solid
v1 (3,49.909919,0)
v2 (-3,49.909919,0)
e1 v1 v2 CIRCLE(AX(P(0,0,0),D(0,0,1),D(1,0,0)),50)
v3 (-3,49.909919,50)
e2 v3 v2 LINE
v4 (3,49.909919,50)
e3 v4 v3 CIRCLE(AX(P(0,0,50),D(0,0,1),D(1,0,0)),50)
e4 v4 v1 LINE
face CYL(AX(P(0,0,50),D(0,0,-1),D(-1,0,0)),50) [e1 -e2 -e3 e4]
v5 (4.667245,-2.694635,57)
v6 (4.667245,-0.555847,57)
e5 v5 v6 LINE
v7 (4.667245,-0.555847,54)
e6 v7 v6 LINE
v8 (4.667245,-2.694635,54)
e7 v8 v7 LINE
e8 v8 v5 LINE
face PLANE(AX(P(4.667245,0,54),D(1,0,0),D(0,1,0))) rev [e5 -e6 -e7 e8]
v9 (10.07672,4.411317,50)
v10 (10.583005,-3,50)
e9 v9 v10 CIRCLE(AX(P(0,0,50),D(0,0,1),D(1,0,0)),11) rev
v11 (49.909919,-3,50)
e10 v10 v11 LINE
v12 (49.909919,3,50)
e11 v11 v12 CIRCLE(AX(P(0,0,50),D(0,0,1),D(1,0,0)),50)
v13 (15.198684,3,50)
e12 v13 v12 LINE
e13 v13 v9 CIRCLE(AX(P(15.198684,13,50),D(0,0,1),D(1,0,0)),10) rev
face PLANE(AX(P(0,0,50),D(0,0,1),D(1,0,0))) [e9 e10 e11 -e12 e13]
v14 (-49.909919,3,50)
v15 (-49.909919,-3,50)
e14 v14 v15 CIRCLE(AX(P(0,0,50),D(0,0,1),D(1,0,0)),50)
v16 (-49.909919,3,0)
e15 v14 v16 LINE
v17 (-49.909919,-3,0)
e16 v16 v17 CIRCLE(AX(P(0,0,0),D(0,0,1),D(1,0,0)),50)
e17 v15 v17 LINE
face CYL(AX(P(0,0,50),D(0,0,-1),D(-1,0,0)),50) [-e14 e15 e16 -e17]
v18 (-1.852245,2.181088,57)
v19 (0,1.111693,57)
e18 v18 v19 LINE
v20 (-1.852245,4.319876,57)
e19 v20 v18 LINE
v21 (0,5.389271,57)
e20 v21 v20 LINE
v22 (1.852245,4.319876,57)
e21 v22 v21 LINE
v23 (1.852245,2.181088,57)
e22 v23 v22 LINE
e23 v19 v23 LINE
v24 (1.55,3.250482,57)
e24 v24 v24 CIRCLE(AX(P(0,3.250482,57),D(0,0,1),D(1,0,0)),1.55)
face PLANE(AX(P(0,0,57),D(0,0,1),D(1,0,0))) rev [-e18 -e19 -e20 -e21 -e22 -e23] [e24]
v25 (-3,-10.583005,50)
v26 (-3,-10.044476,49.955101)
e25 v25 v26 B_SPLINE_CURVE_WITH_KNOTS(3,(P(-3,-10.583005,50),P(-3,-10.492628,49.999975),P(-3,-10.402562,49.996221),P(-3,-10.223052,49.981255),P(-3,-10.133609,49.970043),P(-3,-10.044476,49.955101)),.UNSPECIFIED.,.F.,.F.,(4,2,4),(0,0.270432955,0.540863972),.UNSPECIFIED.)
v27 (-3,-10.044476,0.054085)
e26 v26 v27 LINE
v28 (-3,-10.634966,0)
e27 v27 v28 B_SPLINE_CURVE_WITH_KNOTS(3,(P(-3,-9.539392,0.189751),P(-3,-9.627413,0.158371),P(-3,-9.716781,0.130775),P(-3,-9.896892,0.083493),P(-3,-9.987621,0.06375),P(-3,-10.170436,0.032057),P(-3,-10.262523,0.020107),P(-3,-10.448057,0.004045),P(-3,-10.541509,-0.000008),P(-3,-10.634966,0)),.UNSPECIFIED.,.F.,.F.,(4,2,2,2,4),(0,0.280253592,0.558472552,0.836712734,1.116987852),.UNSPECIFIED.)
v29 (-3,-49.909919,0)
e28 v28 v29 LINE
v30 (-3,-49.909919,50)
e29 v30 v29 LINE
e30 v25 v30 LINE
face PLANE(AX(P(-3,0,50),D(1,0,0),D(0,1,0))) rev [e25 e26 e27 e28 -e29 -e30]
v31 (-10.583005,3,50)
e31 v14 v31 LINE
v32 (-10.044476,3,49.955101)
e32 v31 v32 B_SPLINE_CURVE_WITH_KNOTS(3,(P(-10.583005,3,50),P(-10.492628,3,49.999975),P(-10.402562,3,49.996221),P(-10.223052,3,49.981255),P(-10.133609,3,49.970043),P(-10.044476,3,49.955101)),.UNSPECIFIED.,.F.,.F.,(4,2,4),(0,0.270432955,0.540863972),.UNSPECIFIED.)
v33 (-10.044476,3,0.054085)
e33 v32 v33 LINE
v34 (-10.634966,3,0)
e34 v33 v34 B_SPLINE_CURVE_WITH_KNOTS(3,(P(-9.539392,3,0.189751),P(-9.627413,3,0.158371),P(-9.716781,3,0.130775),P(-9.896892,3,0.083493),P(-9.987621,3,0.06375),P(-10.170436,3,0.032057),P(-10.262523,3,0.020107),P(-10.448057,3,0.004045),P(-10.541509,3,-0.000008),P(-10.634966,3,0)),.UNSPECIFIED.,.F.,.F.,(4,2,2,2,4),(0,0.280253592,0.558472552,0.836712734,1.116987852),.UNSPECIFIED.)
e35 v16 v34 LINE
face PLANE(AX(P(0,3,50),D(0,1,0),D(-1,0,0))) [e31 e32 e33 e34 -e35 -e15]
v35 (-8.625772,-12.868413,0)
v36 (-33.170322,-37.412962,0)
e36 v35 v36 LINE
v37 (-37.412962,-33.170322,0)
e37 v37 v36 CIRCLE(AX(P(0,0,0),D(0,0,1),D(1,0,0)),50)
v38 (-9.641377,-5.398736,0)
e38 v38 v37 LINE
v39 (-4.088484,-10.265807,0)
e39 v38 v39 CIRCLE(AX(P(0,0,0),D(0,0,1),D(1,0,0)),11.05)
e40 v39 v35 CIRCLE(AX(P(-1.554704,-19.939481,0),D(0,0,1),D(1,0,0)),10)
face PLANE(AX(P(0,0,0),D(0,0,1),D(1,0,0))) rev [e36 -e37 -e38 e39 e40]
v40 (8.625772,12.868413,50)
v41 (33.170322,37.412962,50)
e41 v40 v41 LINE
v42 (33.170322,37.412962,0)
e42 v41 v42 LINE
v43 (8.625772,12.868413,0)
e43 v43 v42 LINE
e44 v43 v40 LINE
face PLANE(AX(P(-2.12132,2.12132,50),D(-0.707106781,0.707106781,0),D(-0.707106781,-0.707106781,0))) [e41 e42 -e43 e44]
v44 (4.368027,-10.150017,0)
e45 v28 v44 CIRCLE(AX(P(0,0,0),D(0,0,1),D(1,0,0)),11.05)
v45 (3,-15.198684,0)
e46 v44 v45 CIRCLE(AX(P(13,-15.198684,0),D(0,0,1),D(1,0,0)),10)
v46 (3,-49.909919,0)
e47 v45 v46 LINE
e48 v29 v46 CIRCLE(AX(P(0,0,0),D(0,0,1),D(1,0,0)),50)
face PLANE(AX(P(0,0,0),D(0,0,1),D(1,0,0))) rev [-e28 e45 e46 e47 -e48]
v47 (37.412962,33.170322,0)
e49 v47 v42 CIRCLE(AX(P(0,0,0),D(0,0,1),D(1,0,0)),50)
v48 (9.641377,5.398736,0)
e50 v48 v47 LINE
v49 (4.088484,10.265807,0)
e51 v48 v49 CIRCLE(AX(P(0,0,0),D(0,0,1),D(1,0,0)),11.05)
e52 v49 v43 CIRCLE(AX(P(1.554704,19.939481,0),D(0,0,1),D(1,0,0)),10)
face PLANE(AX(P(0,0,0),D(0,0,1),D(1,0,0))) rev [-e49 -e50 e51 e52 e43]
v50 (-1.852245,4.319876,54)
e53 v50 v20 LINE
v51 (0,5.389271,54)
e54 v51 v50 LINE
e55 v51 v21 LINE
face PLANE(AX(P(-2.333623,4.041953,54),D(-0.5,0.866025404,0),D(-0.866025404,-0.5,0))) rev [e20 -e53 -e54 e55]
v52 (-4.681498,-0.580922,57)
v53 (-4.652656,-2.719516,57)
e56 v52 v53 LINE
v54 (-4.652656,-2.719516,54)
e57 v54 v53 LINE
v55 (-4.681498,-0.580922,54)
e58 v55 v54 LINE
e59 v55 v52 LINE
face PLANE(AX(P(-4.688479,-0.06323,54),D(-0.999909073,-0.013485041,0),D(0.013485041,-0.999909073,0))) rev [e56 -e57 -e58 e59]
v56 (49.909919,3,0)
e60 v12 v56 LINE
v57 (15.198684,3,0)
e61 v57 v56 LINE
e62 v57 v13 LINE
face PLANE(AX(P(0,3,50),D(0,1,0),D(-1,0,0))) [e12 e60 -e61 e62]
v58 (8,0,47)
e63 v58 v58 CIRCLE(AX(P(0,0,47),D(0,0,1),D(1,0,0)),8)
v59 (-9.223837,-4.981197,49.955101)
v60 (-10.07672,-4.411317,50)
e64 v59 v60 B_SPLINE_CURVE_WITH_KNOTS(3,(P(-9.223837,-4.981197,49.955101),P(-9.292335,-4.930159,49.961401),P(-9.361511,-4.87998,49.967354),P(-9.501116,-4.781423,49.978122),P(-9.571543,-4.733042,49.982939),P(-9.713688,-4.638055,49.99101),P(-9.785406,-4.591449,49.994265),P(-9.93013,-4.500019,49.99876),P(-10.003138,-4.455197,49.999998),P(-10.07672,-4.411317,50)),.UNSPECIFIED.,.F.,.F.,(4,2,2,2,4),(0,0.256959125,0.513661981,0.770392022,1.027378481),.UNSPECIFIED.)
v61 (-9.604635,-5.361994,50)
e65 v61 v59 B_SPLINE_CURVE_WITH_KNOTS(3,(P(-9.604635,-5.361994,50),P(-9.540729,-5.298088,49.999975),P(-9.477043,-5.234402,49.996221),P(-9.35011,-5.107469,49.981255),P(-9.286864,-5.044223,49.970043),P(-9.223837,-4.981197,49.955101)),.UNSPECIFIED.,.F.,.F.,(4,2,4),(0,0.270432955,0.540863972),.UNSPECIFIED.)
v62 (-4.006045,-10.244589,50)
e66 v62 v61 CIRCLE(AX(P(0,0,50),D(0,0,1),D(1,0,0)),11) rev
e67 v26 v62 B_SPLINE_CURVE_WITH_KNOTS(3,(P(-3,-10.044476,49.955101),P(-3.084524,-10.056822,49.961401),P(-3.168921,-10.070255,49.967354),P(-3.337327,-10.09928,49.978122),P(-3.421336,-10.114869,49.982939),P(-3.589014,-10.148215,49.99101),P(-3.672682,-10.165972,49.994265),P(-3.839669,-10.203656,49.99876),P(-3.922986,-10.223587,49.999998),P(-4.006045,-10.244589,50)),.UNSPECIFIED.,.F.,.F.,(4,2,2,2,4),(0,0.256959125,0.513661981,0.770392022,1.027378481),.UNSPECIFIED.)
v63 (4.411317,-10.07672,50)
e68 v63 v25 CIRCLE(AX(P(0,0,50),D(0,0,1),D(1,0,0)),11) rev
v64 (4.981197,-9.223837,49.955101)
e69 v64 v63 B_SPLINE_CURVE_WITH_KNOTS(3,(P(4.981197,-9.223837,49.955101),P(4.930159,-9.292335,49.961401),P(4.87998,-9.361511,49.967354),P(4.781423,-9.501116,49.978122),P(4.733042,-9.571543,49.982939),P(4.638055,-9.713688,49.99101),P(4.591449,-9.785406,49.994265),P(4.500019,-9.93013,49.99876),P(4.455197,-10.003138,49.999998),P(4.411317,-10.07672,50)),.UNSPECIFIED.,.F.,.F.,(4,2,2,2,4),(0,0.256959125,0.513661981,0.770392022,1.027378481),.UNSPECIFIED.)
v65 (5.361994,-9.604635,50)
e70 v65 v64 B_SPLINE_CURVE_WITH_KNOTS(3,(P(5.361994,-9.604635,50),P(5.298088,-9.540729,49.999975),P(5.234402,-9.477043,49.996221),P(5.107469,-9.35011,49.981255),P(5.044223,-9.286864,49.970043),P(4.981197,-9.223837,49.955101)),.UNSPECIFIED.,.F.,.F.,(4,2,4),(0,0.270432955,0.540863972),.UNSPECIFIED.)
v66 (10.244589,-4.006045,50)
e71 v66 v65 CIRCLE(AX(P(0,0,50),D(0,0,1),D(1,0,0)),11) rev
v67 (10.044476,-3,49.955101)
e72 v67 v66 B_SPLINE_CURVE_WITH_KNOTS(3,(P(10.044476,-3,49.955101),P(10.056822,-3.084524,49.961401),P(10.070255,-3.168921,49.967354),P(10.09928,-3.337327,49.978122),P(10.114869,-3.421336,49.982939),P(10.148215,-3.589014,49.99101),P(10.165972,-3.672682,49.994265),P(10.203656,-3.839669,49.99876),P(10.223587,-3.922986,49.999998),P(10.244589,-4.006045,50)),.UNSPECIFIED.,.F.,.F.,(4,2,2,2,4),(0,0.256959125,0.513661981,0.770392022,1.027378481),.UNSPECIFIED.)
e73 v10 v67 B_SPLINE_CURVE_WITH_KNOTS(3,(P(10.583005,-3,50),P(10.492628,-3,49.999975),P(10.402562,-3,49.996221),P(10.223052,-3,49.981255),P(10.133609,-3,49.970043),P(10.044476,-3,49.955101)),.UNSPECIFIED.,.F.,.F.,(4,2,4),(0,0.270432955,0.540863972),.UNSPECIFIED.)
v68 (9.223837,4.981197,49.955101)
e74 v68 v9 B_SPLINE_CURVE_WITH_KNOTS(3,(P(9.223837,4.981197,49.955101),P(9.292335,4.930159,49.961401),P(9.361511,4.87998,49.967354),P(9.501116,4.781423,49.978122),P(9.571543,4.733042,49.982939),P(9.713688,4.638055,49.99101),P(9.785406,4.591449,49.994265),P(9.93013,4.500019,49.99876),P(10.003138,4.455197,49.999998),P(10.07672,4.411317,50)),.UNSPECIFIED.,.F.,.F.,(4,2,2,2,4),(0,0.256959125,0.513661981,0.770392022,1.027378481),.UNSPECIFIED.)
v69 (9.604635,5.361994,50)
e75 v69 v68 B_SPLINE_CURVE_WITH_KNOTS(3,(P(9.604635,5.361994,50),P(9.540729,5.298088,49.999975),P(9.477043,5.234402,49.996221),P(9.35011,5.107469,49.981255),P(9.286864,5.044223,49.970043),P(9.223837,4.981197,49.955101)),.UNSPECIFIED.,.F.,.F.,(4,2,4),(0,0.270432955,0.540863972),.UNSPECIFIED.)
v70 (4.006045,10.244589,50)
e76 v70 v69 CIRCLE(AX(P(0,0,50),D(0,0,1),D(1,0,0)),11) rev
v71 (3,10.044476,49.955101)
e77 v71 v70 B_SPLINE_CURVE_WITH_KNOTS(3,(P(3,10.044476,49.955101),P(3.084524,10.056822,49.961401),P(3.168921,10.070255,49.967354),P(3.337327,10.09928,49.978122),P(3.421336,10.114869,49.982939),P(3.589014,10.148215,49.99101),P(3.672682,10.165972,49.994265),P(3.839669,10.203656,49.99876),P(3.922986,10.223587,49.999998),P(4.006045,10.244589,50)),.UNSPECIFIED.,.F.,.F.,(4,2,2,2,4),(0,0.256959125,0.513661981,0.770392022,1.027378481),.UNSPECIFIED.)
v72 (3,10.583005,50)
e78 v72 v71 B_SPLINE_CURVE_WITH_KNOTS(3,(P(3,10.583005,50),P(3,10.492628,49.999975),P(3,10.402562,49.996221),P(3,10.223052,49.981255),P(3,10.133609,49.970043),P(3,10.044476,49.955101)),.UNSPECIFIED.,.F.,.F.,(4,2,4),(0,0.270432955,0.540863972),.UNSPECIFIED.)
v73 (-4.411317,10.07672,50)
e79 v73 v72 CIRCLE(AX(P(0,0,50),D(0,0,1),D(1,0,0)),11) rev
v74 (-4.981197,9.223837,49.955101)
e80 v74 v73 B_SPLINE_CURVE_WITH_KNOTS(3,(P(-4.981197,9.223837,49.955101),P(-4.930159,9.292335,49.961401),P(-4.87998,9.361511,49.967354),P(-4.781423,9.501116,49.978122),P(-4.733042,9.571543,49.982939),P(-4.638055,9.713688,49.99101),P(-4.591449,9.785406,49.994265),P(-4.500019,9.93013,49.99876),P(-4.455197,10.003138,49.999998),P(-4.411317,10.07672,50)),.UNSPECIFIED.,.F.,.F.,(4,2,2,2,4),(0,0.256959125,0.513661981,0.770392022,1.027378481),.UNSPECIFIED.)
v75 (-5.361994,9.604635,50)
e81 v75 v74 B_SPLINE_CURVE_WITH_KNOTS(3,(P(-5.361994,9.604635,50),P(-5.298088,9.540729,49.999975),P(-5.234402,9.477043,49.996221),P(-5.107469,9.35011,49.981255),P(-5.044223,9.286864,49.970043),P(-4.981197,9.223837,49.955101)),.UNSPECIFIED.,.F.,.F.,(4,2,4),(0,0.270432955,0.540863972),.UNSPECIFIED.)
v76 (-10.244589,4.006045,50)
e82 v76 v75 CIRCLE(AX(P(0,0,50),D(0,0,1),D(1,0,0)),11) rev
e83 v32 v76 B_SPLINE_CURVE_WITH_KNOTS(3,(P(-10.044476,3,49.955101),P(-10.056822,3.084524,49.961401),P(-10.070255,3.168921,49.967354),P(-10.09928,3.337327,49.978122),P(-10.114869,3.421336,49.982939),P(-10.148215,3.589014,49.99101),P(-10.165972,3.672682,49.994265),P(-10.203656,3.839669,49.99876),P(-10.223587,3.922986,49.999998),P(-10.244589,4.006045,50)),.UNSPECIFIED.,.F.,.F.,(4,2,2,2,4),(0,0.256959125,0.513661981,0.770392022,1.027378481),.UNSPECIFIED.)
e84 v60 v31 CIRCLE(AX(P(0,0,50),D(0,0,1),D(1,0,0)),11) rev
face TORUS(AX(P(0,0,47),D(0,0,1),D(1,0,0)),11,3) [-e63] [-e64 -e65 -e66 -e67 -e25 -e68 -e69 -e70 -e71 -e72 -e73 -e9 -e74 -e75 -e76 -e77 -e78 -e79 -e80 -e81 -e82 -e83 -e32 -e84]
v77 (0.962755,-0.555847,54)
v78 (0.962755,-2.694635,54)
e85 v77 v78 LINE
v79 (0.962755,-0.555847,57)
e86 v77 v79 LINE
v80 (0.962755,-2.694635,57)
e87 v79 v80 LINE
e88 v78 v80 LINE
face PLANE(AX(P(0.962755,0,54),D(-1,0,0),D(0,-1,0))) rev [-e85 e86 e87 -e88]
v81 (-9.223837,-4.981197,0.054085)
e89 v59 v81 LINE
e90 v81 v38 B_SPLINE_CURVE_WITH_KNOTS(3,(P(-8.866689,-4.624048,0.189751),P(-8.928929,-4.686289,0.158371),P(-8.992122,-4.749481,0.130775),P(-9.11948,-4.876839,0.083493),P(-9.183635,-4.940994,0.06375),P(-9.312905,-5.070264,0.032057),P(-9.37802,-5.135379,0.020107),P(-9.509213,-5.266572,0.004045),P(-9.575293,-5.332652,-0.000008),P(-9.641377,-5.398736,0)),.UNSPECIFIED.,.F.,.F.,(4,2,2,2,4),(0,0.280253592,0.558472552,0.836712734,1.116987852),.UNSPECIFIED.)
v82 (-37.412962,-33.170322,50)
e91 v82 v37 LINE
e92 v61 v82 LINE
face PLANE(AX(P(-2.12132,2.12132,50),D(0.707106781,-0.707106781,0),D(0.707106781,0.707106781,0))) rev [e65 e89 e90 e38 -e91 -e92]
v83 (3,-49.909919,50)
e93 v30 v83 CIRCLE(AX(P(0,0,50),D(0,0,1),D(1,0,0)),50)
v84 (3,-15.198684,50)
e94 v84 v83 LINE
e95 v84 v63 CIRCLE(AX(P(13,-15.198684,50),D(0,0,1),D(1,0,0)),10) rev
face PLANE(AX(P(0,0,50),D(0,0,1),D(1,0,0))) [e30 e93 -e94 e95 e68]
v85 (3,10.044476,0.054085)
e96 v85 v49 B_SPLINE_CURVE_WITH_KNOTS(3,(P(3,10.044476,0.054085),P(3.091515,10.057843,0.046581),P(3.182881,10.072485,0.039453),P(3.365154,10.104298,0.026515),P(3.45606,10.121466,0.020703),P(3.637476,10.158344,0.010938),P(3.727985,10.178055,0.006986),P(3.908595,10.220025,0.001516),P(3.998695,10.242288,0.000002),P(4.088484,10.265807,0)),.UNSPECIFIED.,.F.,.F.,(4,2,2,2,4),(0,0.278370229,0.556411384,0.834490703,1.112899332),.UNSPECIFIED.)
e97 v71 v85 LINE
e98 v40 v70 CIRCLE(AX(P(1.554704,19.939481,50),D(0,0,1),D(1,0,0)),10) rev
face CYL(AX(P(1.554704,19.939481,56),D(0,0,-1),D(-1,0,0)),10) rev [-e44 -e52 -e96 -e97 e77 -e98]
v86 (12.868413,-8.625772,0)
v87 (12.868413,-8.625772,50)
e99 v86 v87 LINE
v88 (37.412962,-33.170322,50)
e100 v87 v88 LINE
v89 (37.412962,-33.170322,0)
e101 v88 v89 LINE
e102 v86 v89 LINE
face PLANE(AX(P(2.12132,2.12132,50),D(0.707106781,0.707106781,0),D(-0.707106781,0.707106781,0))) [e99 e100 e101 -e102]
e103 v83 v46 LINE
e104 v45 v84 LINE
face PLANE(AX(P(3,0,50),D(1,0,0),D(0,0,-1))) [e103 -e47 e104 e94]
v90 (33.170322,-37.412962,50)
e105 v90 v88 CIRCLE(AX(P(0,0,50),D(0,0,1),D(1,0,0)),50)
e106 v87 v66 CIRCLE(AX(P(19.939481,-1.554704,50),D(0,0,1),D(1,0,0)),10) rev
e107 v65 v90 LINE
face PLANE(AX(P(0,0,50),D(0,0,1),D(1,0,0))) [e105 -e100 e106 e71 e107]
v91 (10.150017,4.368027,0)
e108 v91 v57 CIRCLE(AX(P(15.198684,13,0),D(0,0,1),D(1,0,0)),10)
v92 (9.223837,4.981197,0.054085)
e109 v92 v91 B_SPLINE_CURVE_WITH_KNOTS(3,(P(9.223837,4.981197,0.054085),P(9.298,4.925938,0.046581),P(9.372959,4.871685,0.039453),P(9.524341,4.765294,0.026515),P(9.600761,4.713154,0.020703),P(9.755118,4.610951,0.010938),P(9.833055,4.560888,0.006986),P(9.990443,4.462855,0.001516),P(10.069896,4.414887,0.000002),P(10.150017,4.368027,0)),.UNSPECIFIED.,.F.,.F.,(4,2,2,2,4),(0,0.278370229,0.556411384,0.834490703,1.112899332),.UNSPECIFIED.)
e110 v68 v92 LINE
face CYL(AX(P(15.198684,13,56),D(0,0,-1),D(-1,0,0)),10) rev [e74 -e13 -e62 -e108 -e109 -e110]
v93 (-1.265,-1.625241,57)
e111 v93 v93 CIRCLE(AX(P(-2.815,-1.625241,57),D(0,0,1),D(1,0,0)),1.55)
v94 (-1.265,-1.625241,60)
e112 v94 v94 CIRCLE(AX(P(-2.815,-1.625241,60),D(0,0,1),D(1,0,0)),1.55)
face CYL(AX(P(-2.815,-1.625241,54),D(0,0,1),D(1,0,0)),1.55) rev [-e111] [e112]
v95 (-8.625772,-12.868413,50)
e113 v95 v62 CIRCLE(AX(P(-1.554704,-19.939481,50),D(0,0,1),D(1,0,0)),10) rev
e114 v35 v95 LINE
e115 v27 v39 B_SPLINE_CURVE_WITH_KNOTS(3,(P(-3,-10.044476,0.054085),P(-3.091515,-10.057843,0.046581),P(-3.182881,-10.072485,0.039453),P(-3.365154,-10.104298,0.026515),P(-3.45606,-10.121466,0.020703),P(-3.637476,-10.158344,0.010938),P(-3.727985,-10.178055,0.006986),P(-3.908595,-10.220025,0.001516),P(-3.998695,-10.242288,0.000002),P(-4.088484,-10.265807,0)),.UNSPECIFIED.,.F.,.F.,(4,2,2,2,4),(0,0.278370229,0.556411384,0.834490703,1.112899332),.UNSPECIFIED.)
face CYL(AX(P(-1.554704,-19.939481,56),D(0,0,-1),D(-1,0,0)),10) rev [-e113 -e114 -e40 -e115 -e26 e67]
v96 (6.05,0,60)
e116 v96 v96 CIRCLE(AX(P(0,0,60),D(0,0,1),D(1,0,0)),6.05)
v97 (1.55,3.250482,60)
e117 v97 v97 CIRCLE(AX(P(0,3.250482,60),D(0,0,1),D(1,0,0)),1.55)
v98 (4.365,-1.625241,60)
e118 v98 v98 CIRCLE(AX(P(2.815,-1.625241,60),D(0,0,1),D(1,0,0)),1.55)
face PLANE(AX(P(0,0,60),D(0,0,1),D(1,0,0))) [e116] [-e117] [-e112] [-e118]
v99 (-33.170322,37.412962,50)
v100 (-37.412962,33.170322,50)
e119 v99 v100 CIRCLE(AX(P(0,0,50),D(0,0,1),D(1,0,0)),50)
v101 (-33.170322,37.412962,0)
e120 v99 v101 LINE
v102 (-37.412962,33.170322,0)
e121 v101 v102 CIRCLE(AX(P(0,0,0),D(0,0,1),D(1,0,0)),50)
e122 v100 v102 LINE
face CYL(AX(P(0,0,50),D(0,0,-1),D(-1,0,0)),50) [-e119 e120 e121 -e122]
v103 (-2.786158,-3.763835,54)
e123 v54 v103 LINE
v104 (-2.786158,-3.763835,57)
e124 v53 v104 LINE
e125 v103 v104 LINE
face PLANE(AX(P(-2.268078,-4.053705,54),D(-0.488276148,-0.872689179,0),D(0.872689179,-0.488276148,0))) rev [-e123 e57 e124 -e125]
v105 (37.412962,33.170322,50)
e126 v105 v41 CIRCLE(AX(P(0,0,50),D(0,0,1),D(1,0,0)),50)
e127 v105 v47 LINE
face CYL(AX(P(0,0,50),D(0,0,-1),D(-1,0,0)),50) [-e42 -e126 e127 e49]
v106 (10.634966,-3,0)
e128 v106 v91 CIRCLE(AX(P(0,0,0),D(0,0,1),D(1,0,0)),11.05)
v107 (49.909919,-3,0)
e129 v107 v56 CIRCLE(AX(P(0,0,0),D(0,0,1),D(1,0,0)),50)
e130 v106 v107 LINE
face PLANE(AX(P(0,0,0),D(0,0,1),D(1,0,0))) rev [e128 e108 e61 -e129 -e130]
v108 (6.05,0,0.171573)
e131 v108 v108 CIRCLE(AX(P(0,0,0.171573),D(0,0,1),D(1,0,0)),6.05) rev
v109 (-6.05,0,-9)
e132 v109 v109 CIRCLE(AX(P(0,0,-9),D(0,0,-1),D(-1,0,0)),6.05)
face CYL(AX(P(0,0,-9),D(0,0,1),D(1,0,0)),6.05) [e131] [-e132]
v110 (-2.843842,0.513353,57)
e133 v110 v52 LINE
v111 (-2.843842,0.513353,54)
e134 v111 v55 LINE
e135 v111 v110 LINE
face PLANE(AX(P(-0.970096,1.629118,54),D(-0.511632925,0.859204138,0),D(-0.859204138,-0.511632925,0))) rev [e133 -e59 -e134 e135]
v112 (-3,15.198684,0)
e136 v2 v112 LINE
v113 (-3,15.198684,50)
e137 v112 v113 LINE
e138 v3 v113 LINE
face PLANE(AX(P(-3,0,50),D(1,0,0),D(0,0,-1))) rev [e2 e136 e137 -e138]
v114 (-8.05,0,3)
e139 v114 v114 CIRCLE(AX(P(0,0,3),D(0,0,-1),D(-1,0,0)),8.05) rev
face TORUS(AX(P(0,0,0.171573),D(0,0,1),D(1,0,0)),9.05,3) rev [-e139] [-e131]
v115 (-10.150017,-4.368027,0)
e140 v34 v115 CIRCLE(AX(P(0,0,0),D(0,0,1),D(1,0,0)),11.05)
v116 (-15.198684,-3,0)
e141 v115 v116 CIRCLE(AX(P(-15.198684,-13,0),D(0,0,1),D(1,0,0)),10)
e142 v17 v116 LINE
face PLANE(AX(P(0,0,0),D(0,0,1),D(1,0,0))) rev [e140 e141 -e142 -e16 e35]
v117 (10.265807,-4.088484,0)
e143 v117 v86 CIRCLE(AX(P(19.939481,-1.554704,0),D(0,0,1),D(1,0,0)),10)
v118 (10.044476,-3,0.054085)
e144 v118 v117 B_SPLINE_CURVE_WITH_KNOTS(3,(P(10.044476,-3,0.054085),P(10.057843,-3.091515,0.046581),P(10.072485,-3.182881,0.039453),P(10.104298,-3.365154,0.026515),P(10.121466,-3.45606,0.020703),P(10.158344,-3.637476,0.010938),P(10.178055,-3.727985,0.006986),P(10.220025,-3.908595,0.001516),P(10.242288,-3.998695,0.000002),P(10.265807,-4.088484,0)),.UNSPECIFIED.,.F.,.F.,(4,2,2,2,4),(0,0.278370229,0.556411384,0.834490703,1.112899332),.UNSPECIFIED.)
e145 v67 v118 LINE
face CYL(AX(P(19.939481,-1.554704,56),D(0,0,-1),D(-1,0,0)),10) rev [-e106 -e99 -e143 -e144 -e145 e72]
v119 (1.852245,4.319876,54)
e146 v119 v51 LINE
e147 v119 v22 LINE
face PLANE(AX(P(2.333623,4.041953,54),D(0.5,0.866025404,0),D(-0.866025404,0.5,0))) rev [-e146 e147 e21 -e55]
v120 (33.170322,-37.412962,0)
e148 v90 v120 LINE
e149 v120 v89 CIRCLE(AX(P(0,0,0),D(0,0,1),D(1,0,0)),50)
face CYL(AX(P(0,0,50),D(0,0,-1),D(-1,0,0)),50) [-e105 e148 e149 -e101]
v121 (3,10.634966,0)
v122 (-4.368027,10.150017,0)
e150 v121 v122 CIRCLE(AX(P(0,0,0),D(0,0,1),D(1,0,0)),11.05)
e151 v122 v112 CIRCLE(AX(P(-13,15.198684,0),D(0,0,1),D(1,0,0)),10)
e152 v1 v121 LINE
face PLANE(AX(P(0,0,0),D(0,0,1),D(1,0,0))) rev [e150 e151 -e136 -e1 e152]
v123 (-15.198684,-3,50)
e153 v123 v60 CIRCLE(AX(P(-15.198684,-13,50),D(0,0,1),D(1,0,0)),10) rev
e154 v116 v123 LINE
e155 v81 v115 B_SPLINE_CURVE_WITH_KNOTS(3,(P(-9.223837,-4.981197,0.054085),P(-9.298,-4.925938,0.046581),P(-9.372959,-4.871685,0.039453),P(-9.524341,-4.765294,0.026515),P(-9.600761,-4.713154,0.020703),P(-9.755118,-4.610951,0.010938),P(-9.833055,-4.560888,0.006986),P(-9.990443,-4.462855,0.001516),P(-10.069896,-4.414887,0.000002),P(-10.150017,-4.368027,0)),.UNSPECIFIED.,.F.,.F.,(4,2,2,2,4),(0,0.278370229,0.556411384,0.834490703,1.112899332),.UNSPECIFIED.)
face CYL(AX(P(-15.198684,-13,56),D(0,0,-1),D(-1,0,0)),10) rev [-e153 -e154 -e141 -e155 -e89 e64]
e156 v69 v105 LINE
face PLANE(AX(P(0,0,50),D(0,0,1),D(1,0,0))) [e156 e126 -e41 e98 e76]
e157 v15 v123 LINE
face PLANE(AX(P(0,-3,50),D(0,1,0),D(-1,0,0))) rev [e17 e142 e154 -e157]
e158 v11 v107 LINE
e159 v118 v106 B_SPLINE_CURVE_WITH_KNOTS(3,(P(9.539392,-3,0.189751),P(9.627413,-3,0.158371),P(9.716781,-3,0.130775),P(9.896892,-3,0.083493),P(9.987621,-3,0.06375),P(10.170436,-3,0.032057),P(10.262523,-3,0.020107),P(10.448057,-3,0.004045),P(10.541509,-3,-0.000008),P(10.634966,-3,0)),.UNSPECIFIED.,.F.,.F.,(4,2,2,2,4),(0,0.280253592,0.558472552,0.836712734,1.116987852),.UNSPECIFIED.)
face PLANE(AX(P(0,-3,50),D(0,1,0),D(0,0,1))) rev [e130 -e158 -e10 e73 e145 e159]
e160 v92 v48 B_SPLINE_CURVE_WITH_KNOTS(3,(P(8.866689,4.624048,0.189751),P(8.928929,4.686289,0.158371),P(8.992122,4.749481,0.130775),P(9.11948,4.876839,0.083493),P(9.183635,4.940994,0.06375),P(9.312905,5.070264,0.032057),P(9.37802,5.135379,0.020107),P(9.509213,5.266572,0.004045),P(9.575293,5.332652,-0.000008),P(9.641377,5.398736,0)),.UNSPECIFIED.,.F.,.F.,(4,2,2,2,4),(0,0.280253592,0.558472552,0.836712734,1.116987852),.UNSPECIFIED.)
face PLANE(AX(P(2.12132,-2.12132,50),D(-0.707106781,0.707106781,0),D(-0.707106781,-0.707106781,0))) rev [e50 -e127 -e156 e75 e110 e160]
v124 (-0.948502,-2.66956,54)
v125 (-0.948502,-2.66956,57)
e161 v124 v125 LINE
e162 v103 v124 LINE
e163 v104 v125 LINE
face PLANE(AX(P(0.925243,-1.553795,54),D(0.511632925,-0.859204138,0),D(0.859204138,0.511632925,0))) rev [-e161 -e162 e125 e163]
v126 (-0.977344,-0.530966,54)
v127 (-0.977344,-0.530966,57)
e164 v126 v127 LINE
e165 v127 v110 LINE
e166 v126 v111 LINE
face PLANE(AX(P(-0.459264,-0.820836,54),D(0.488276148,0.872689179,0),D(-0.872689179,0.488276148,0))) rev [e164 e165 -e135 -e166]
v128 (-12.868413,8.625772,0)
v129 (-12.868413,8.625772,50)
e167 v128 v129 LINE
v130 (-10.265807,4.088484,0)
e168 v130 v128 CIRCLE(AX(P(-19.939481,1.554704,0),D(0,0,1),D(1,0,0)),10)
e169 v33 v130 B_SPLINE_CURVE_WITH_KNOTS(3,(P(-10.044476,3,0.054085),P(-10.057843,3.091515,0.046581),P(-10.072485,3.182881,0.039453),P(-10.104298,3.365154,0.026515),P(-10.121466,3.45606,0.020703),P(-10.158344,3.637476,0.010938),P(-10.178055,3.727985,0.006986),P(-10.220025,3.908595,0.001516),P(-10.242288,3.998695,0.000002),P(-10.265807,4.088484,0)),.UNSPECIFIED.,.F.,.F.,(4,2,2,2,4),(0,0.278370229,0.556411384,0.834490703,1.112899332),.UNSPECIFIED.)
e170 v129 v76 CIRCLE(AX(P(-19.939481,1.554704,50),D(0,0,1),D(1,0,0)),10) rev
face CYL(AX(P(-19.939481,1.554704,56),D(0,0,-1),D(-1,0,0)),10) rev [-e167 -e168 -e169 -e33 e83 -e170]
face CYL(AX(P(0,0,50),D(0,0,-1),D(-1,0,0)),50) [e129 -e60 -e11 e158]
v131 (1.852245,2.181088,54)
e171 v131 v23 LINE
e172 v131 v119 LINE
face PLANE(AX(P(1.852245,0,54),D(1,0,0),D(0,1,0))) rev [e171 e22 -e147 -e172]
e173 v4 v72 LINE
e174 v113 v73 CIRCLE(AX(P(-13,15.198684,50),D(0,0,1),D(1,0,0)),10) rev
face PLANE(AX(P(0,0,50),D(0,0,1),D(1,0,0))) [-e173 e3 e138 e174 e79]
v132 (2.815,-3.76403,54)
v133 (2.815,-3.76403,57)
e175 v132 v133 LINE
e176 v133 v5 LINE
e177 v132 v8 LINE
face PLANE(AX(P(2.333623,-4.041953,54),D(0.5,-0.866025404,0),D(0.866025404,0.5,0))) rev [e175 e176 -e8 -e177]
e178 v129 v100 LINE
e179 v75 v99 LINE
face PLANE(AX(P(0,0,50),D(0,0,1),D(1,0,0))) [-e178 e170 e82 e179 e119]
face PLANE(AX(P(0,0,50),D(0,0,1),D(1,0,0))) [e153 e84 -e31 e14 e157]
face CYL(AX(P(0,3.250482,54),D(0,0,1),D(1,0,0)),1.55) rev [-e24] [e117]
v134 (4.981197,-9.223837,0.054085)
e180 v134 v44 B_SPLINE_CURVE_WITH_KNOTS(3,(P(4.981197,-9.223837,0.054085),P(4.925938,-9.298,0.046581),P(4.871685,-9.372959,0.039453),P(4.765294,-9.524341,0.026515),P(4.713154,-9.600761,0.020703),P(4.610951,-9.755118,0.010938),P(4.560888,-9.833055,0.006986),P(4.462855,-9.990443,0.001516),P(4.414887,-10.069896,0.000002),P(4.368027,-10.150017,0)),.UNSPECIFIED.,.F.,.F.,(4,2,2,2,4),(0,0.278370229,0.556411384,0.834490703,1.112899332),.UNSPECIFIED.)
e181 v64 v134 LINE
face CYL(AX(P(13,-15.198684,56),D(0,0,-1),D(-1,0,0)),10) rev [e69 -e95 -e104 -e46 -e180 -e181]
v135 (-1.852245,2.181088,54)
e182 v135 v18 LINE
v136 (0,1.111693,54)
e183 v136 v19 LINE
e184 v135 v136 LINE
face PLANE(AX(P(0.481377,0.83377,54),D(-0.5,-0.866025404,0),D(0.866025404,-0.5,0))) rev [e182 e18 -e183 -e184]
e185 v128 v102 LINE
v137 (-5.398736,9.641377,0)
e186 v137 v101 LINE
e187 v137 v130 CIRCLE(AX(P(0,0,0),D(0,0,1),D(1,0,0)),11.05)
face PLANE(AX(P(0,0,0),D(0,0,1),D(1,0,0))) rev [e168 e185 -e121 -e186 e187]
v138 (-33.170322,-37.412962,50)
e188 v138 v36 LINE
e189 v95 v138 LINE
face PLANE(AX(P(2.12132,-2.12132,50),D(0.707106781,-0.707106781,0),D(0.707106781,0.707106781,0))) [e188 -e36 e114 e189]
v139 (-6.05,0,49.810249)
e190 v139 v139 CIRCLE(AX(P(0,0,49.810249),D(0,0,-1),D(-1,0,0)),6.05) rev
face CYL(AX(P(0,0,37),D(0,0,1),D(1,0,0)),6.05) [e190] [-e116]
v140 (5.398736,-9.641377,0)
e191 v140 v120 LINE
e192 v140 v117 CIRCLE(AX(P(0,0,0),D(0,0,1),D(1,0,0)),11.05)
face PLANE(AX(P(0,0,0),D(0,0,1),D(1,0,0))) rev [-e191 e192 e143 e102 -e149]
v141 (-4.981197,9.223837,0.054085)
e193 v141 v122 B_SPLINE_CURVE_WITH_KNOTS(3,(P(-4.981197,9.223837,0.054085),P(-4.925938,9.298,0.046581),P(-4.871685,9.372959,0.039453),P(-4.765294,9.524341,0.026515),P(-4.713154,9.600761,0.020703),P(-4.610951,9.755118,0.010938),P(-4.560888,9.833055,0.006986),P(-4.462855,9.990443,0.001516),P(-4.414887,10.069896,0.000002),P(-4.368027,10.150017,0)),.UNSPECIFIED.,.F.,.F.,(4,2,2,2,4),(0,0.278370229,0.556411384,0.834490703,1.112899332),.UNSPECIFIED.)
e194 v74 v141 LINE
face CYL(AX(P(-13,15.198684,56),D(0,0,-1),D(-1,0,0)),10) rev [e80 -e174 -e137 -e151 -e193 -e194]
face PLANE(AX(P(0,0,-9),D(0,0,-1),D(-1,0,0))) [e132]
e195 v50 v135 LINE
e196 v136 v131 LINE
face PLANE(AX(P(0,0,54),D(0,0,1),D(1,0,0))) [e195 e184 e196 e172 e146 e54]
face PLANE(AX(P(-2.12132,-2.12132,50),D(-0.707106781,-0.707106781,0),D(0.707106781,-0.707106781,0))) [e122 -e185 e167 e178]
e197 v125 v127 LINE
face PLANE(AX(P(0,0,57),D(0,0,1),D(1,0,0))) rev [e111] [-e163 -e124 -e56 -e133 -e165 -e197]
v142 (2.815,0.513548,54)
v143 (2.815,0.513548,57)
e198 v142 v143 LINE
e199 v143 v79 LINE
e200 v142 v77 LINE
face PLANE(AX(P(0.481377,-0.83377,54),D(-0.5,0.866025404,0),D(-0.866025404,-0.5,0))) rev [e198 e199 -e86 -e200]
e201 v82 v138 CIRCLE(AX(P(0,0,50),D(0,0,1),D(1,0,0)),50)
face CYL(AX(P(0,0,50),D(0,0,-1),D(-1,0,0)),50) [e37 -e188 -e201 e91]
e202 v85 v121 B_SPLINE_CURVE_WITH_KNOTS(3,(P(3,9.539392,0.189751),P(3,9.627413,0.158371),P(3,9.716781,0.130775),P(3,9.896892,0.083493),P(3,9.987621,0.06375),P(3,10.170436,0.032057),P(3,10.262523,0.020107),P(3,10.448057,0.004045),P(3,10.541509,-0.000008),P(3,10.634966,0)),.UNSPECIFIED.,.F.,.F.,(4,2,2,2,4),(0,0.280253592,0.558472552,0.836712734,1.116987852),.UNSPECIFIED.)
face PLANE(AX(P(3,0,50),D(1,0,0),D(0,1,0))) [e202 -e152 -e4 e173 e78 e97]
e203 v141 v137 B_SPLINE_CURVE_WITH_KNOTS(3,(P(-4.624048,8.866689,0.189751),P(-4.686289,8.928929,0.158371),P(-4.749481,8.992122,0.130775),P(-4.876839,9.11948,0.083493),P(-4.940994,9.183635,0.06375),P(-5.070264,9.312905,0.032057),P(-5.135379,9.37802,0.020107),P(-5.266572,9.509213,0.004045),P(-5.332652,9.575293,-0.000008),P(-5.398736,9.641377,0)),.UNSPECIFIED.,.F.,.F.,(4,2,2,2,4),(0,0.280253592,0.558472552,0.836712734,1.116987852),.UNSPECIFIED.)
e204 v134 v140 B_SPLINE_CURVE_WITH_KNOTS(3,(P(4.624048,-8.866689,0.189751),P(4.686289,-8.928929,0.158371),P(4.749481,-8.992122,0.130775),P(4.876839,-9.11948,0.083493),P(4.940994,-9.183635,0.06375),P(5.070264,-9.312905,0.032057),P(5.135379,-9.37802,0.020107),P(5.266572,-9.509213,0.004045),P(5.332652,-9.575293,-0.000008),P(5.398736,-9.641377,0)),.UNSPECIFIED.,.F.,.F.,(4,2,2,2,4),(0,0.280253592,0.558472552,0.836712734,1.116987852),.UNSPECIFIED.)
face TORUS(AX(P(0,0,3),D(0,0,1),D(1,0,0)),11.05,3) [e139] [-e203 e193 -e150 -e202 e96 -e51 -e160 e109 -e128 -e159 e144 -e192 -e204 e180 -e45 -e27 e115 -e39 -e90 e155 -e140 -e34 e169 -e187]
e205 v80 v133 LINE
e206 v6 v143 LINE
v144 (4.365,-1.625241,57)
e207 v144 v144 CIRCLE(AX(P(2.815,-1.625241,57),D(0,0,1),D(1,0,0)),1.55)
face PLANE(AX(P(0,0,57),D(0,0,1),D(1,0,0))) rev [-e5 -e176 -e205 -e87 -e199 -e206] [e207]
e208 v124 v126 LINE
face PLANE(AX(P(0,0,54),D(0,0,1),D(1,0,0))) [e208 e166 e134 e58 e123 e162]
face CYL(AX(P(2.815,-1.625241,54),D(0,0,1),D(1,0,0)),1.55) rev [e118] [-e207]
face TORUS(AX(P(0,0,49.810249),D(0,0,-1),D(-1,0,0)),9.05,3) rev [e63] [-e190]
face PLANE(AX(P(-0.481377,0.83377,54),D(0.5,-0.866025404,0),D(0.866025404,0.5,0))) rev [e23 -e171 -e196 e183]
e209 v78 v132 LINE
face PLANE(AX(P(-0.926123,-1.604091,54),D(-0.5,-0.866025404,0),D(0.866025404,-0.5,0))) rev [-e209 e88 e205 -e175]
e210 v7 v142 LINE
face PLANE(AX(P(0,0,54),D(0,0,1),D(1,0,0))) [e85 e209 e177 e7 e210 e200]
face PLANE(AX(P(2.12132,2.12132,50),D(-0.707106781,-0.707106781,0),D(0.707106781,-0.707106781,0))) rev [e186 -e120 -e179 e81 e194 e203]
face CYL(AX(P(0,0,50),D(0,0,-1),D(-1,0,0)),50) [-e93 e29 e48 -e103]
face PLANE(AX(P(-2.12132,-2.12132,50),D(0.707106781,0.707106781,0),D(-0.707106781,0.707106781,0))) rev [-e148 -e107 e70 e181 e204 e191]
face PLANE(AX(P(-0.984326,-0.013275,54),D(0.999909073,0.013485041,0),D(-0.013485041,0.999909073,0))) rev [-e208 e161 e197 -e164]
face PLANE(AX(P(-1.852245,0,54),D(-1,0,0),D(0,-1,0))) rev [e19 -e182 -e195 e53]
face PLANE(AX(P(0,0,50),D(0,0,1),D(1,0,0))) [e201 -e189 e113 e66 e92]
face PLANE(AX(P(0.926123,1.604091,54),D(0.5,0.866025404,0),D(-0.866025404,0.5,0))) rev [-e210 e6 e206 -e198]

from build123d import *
from build123d.topology import SkipClean

# Parameters (mm, degrees)
BOSS_EXTRUDE1_DEPTH = 50
SKETCH2_R           = 10
BOSS_EXTRUDE3_DEPTH = 6
BOSS_EXTRUDE4_START = -50
SKETCH2_2_R         = 10
BOSS_EXTRUDE4_DEPTH = 50
SKETCH3_R           = 6.05
BOSS_EXTRUDE5_DEPTH = 9
CUT_EXTRUDE2_START  = -3
SKETCH4_R           = 8.05
SKETCH4_R_2         = 6.05
CUT_EXTRUDE2_DEPTH  = 3
FILLET1_R           = 3
FILLET2_DEPTH       = 50
CUT_EXTRUDE6_START  = -6
SKETCH8_R           = 10
CUT_EXTRUDE6_DEPTH  = 6
BOSS_EXTRUDE6_START = 10
SKETCH9_R           = 6.05
BOSS_EXTRUDE6_DEPTH = 10
SKETCH10_R          = 8
CUT_EXTRUDE7_DEPTH  = 3
FILLET3_R           = 3
SKETCH11_R          = 6.05
BOSS_EXTRUDE7_DEPTH = 23
FILLET4_R           = 3
CUT_EXTRUDE8_DEPTH  = 6
CUT_EXTRUDE9_START  = -3
CUT_EXTRUDE9_DEPTH  = 3


with BuildPart() as part:
    # Sketch1 → Boss-Extrude1 (new body)
    with BuildSketch(Plane.XY):
        with BuildLine():
            ThreePointArc((2.9999999999990807, 49.909918853871176), (-6.5197e-13, 50), (-3.0000000000003824, 49.9099188538711))
            Line((-3, 49.909918853871076), (-3, 7.242640687119284))
            Line((-3, 7.2426406871192865), (-33.17032172648287, 37.41296241360215))
            ThreePointArc((-33.170321726482385, 37.41296241360273), (-35.35533905932737, 35.35533905932738), (-37.41296241360272, 33.17032172648239))
            Line((-37.41296241360216, 33.17032172648288), (-7.242640687119308, 3.0000000000000164))
            Line((-7.242640687119305, 3.0000000000000164), (-49.90991885387109, 3))
            ThreePointArc((-49.90991885387111, 3.0000000000002145), (-50, 6.12e-15), (-49.90991885387111, -3.0000000000002016))
            Line((-49.9099188538711, -3), (-7.242640687119284, -3.0000000000000027))
            Line((-7.242640687119285, -3.0000000000000027), (-37.412962413602166, -33.17032172648288))
            ThreePointArc((-37.41296241360273, -33.170321726482385), (-35.355339059327385, -35.35533905932737), (-33.17032172648241, -37.4129624136027))
            Line((-33.17032172648289, -37.41296241360217), (-3.0000000000000053, -7.24264068711929))
            Line((-3.0000000000000053, -7.24264068711929), (-3, -49.90991885387107))
            ThreePointArc((-3.000000000000395, -49.9099188538711), (-6.7532e-13, -50), (2.9999999999990465, -49.909918853871176))
            Line((3, -49.90991885387123), (3, -7.242640687119285))
            Line((3, -7.242640687119285), (33.17032172648288, -37.412962413602166))
            ThreePointArc((33.170321726482385, -37.41296241360273), (35.35533905932737, -35.355339059327385), (37.41296241360272, -33.1703217264824))
            Line((37.412962413602166, -33.17032172648288), (7.242640687119286, -3))
            Line((7.242640687119286, -3), (49.90991885387112, -3))
            ThreePointArc((49.90991885387112, -3.000000000000043), (49.97747463954914, -1.5006760653858835), (50, -1.225e-14))
            ThreePointArc((50, 0), (49.97747463954915, 1.5006760653855677), (49.909918853871154, 2.9999999999994245))
            Line((49.90991885387119, 3), (7.242640687119281, 2.9999999999999973))
            Line((7.242640687119281, 2.9999999999999973), (37.41296241360216, 33.170321726482875))
            ThreePointArc((37.41296241360273, 33.17032172648239), (35.35533905932737, 35.35533905932738), (33.170321726482385, 37.41296241360273))
            Line((33.1703217264829, 37.41296241360218), (3.0000000000000018, 7.242640687119292))
            Line((3.0000000000000018, 7.242640687119291), (3, 49.90991885387123))
        make_face()
    extrude(amount=BOSS_EXTRUDE1_DEPTH)

    # Sketch2 → Boss-Extrude3 (add)
    with BuildSketch(Plane.XY.offset(50)):
        with Locations(Location((0, 0, 0), (0, 0, 197.457603124))):
            Circle(SKETCH2_R)
    extrude(amount=BOSS_EXTRUDE3_DEPTH)

    # Sketch2<2> → Boss-Extrude4 (add)
    with BuildSketch(Plane.XY.offset(50).offset(BOSS_EXTRUDE4_START)):
        with Locations(Location((0, 0, 0), (0, 0, 197.457603124))):
            Circle(SKETCH2_2_R)
    extrude(amount=BOSS_EXTRUDE4_DEPTH)

    # Sketch3 → Boss-Extrude5 (add)
    with BuildSketch(Plane(origin=(0, 0, 0), x_dir=(-1, 0, 0), z_dir=(0, 0, -1))):
        with Locations(Location((0, 0, 0), (0, 0, 180))):
            Circle(SKETCH3_R)
    extrude(amount=BOSS_EXTRUDE5_DEPTH)

    # Sketch4 → Cut-Extrude2 (cut)
    with BuildSketch(Plane(origin=(0, 0, 0), x_dir=(-1, 0, 0), z_dir=(0, 0, -1)).offset(CUT_EXTRUDE2_START)):
        Circle(SKETCH4_R)
        Circle(SKETCH4_R_2, mode=Mode.SUBTRACT)
    extrude(amount=CUT_EXTRUDE2_DEPTH, mode=Mode.SUBTRACT)

    # Fillet1
    # the kernel refuses this fillet: 3 mm, written as the material it adds along each edge
    with BuildSketch(Plane(origin=(0, 0, 3), x_dir=(-1, 0, 0), z_dir=(0, -1, 0))) as fillet1_piece_1:
        with BuildLine():
            CenterArc((9.05, 2.8284271247461903), FILLET1_R, 180, 70.52877936550931)
            Line((6.050000000000001, 2.8284271247461903), (6.05, 0))
            Line((6.05, 0), (8.05, 4.4e-16))
        make_face()
    revolve(axis=Axis((0, 0, 3), (0, 0, -1)))
    # the kernel refuses this fillet: 3 mm, written as the material it takes off along each edge
    with BuildSketch(Plane(origin=(0, 0, 0), x_dir=(-1, 0, 0), z_dir=(0, -1, 0))) as fillet1_2_piece_1:
        with BuildLine():
            CenterArc((8.05 + FILLET1_R, -FILLET1_R), FILLET1_R, 90, 90)
            Line((8.05, -FILLET1_R), (8.05, 0))
            Line((8.05, 0), (8.05 + FILLET1_R, 0))
        make_face()
    revolve(axis=Axis((0, 0, 0), (0, 0, -1)), mode=Mode.SUBTRACT)

    # Fillet2: read off the stored shape, not the designer's step
    # Fillet2 outline → Fillet2 (add)
    with BuildSketch(Plane.XY):
        with BuildLine():
            Line((4.624048438, 8.866689125), (8.625772287, 12.868412974))
            ThreePointArc((8.625772287, 12.868412974), (6.040879484, 11.002242186), (3, 10.044475942))
            Line((3, 10.044475942), (3, 9.539392014))
            ThreePointArc((3, 9.539392014), (3.826834324, 9.238795325), (4.624048438, 8.866689125))
        make_face()
        with BuildLine():
            Line((9.223837396, 4.981196709), (8.866689125, 4.624048438))
            ThreePointArc((8.866689125, 4.624048438), (9.238795325, 3.826834324), (9.539392014, 3))
            Line((9.539392014, 3), (15.198684154, 3))
            ThreePointArc((15.198684154, 3), (12.051306905, 3.508213211), (9.223837396, 4.981196709))
        make_face()
        with BuildLine():
            ThreePointArc((-4.624048438, 8.866689125), (-3.826834324, 9.238795325), (-3, 9.539392014))
            Line((-3, 9.539392014), (-3, 15.198684154))
            ThreePointArc((-3, 15.198684154), (-3.508213211, 12.051306905), (-4.981196709, 9.223837396))
            Line((-4.981196709, 9.223837396), (-4.624048438, 8.866689125))
        make_face()
        with BuildLine():
            ThreePointArc((-9.539392014, 3), (-9.238795325, 3.826834324), (-8.866689125, 4.624048438))
            Line((-8.866689125, 4.624048438), (-12.868412974, 8.625772287))
            ThreePointArc((-12.868412974, 8.625772287), (-11.002242186, 6.040879484), (-10.044475942, 3))
            Line((-10.044475942, 3), (-9.539392014, 3))
        make_face()
        with BuildLine():
            Line((10.044475942, -3), (9.539392014, -3))
            ThreePointArc((9.539392014, -3), (9.238795325, -3.826834324), (8.866689125, -4.624048438))
            Line((8.866689125, -4.624048438), (12.868412974, -8.625772287))
            ThreePointArc((12.868412974, -8.625772287), (11.002242186, -6.040879484), (10.044475942, -3))
        make_face()
        with BuildLine():
            ThreePointArc((-8.866689125, -4.624048438), (-9.238795325, -3.826834324), (-9.539392014, -3))
            Line((-9.539392014, -3), (-15.198684154, -3))
            ThreePointArc((-15.198684154, -3), (-12.051306905, -3.508213211), (-9.223837396, -4.981196709))
            Line((-9.223837396, -4.981196709), (-8.866689125, -4.624048438))
        make_face()
        with BuildLine():
            Line((4.981196709, -9.223837396), (4.624048438, -8.866689125))
            ThreePointArc((4.624048438, -8.866689125), (3.826834324, -9.238795325), (3, -9.539392014))
            Line((3, -9.539392014), (3, -15.198684154))
            ThreePointArc((3, -15.198684154), (3.508213211, -12.051306905), (4.981196709, -9.223837396))
        make_face()
        with BuildLine():
            ThreePointArc((-3, -9.539392014), (-3.826834324, -9.238795325), (-4.624048438, -8.866689125))
            Line((-4.624048438, -8.866689125), (-8.625772287, -12.868412974))
            ThreePointArc((-8.625772287, -12.868412974), (-6.040879484, -11.002242186), (-3, -10.044475942))
            Line((-3, -10.044475942), (-3, -9.539392014))
        make_face()
    extrude(amount=FILLET2_DEPTH)

    # Fillet2 2 outline → Fillet2 2 (revolve, cut)
    with SkipClean():  # the faces are left unmerged after this step: merging them gives an invalid solid
        with BuildSketch(Plane.XZ):
            with BuildLine():
                ThreePointArc((11.05, 0), (10.516496156, 0.047818832), (10, 0.1897509))
                Line((10, 0.1897509), (10, 0))
                Line((10, 0), (11.05, 0))
            make_face()
        revolve(axis=Axis((0, 0, 0), (0, 0, 1)), mode=Mode.SUBTRACT)

    # Sketch8 → Cut-Extrude6 (cut)
    with SkipClean():  # the faces are left unmerged after this step: merging them gives an invalid solid
        with BuildSketch(Plane.XY.offset(56).offset(CUT_EXTRUDE6_START)):
            Circle(SKETCH8_R)
        extrude(amount=CUT_EXTRUDE6_DEPTH, mode=Mode.SUBTRACT)

    # Sketch9 → Boss-Extrude6 (add)
    with SkipClean():  # the faces are left unmerged after this step: merging them gives an invalid solid
        with BuildSketch(Plane.XY.offset(50).offset(BOSS_EXTRUDE6_START)):
            Circle(SKETCH9_R)
        extrude(amount=-BOSS_EXTRUDE6_DEPTH)

    # Sketch10 → Cut-Extrude7 (cut)
    with SkipClean():  # the faces are left unmerged after this step: merging them gives an invalid solid
        with BuildSketch(Plane.XY.offset(50)):
            Circle(SKETCH10_R)
        extrude(amount=-CUT_EXTRUDE7_DEPTH, mode=Mode.SUBTRACT)


with BuildPart() as cut_extrude7_piece_1:
    # of the separate pieces the step leaves, piece 1, a body of its own (cut_extrude7_pieces)
    add(part.part.solids().sort_by_distance((-6.05, 0, 0.171572875))[0])

    # Fillet3
    # the kernel refuses this fillet: 3 mm, written as the material it takes off along each edge
    with BuildSketch(Plane(origin=(0, 0, 50), x_dir=(1, 0, 0), z_dir=(0, -1, 0))) as fillet3_piece_1:
        with BuildLine():
            CenterArc((8 + FILLET3_R, -FILLET3_R), FILLET3_R, 90, 90)
            Line((8, -FILLET3_R), (8, 0))
            Line((8, 0), (8 + FILLET3_R, 0))
        make_face()
    revolve(axis=Axis((0, 0, 50), (0, 0, 1)), mode=Mode.SUBTRACT)



with BuildPart() as cut_extrude7_piece_2:
    # of the separate pieces the step leaves, piece 2, a body of its own (cut_extrude7_pieces)
    add(part.part.solids().sort_by_distance((6.05, 0, 60))[0])


with BuildPart() as cut_extrude7_piece_1_1:
    add(cut_extrude7_piece_1.part)

    add(cut_extrude7_piece_2.part)  # Boss-Extrude7 merges Cut-Extrude7 piece 2
    # Sketch11 → Boss-Extrude7 (add)
    with BuildSketch(Plane.XY.offset(60.00000000000001)):
        Circle(SKETCH11_R)
    extrude(amount=-BOSS_EXTRUDE7_DEPTH)

    # Fillet4
    # the kernel refuses this fillet: 3 mm, written as the material it adds along each edge
    with BuildSketch(Plane(origin=(0, 0, 47), x_dir=(1, 0, 0), z_dir=(0, -1, 0))) as fillet4_piece_1:
        with BuildLine():
            CenterArc((9.05, 2.8102490992792752), FILLET4_R, 180, 69.51268488527728)
            Line((7.999999999999998, 0), (7.978999999999998, -0.05620498198558721))
            ThreePointArc((7.978999999999998, -0.05620498198558721), (7.024999999999999, -0.06000000000000227), (6.05, -0.06000000000000227))
            Line((6.05, -0.06000000000000227), (5.99, 0))
            Line((5.99, 0), (5.990000000000001, 2.8102490992792752))
            Line((5.990000000000001, 2.8102490992792752), (6.050000000000001, 2.8102490992792752))
        make_face()
    revolve(axis=Axis((0, 0, 47), (0, 0, 1)))

    # Sketch12 → Cut-Extrude8 (cut)
    with BuildSketch(Plane.XY.offset(60.00000000000001)):
        with BuildLine():
            Line((-0.7750000000000001, 1.9081426396717127), (0, 3.2504820155375924))
            Line((0, 3.2504820155375924), (0.7750000000000004, 1.9081426396717123))
            ThreePointArc((0.7750000000000109, 1.9081426396717187), (1.342339375865883, 2.4754820155375974), (1.55, 3.250482015537592))
            ThreePointArc((1.55, 3.2504820155375924), (-0.7749999999999944, 4.592821391403476), (-0.7750000000000113, 1.9081426396717192))
        make_face()
        with BuildLine():
            Line((0.7750000000000004, 1.9081426396717123), (0, 3.2504820155375924))
            Line((0, 3.2504820155375924), (0, 1.7004820155375924))
            ThreePointArc((1.09e-15, 1.7004820155375924), (0.4011695199089145, 1.7532969847895385), (0.7750000000000109, 1.9081426396717187))
        make_face()
        with BuildLine():
            Line((0, 1.7004820155375924), (0, 3.2504820155375924))
            Line((0, 3.2504820155375924), (-0.7750000000000001, 1.9081426396717127))
            ThreePointArc((-0.7750000000000113, 1.9081426396717192), (-0.4011695199089123, 1.7532969847895379), (1.09e-15, 1.7004820155375924))
        make_face()
        with BuildLine():
            Line((-2.815, -1.6252410077687962), (-2.0399999999999996, -0.2829016319029156))
            ThreePointArc((-2.0399999999999885, -0.2829016319029227), (-4.157339375865883, -2.4002410077687912), (-1.265, -1.6252410077687953))
            Line((-1.2650000000000001, -1.6252410077687962), (-2.815, -1.6252410077687962))
        make_face()
        with BuildLine():
            ThreePointArc((-1.4726606241341267, -0.8502410077687849), (-1.7189844891608514, -0.5292254969296475), (-2.0399999999999885, -0.2829016319029227))
            Line((-2.0399999999999996, -0.2829016319029156), (-2.815, -1.6252410077687962))
            Line((-2.815, -1.6252410077687962), (-1.47266062413412, -0.8502410077687963))
        make_face()
        with BuildLine():
            Line((-1.47266062413412, -0.8502410077687963), (-2.815, -1.6252410077687962))
            Line((-2.815, -1.6252410077687962), (-1.2650000000000001, -1.6252410077687962))
            ThreePointArc((-1.265, -1.6252410077687962), (-1.3178149692519456, -1.2240714878598826), (-1.4726606241341267, -0.8502410077687849))
        make_face()
        with BuildLine():
            ThreePointArc((4.365, -1.6252410077687962), (3.5899999999999945, -0.28290163190291273), (2.0399999999999885, -0.28290163190292295))
            Line((2.04, -0.2829016319029165), (2.815, -1.6252410077687962))
            Line((2.815, -1.6252410077687962), (1.2649999999999997, -1.6252410077687962))
            ThreePointArc((1.2649999999999997, -1.625241007768796), (2.8149999999999995, -3.1752410077687965), (4.365, -1.6252410077687967))
        make_face()
        with BuildLine():
            Line((2.815, -1.6252410077687962), (2.04, -0.2829016319029165))
            ThreePointArc((2.0399999999999885, -0.28290163190292295), (1.7189844891608512, -0.5292254969296473), (1.4726606241341267, -0.8502410077687842))
            Line((1.4726606241341198, -0.8502410077687962), (2.815, -1.6252410077687962))
        make_face()
        with BuildLine():
            Line((1.2649999999999997, -1.6252410077687962), (2.815, -1.6252410077687962))
            Line((2.815, -1.6252410077687962), (1.4726606241341198, -0.8502410077687962))
            ThreePointArc((1.4726606241341267, -0.8502410077687842), (1.3178149692519456, -1.2240714878598826), (1.2649999999999997, -1.625241007768796))
        make_face()
    extrude(amount=-CUT_EXTRUDE8_DEPTH, mode=Mode.SUBTRACT)

    # Sketch12<3> → Cut-Extrude9 (cut)
    with BuildSketch(Plane.XY.offset(60.00000000000001).offset(CUT_EXTRUDE9_START)):
        with BuildLine():
            Line((1.4726606241341198, -0.8502410077687962), (0.962754687166605, -0.5558466777992132))
            Line((0.9627546871666026, -0.5558466777992174), (0.9627546871666027, -1.6252410077687962))
            Line((0.9627546871666026, -1.6252410077687962), (1.2649999999999997, -1.6252410077687962))
            ThreePointArc((1.2649999999999997, -1.625241007768796), (1.3178149692519456, -1.2240714878598826), (1.4726606241341267, -0.8502410077687842))
        make_face()
        with BuildLine():
            Line((2.04, -0.2829016319029165), (1.8888773435833035, -0.02114951281442323))
            Line((1.8888773435833035, -0.02114951281442246), (0.9627546871666026, -0.5558466777992174))
            Line((0.962754687166605, -0.5558466777992132), (1.4726606241341198, -0.8502410077687962))
            ThreePointArc((1.4726606241341267, -0.8502410077687842), (1.7189844891608512, -0.5292254969296473), (2.0399999999999885, -0.28290163190292295))
        make_face()
        with BuildLine():
            Line((2.815, 0.51354765217037), (1.8888773435833035, -0.02114951281442246))
            Line((1.8888773435833035, -0.02114951281442323), (2.04, -0.2829016319029165))
            ThreePointArc((2.0399999999999885, -0.28290163190292295), (3.5899999999999945, -0.28290163190291273), (4.365, -1.6252410077687962))
            ThreePointArc((4.365, -1.6252410077687967), (2.8149999999999995, -3.1752410077687965), (1.2649999999999997, -1.625241007768796))
            Line((1.2649999999999997, -1.6252410077687962), (0.9627546871666026, -1.6252410077687962))
            Line((0.9627546871666027, -1.6252410077687962), (0.962754687166603, -2.694635337738379))
            Line((0.962754687166603, -2.694635337738379), (2.8149999999999973, -3.7640296677079643))
            Line((2.8149999999999973, -3.7640296677079643), (4.667245312833395, -2.6946353377383816))
            Line((4.667245312833395, -2.6946353377383816), (4.667245312833397, -0.5558466777992148))
            Line((4.667245312833397, -0.5558466777992148), (2.815, 0.5135476521703701))
        make_face()
        with BuildLine():
            Line((-2.0399999999999996, -0.2829016319029156), (-1.8887931260915947, -0.02100364383989728))
            Line((-1.8887931260915947, -0.02100364383989728), (-2.84384165312799, 0.5133531778889796))
            Line((-2.84384165312799, 0.5133531778889795), (-4.681497719729323, -0.5809215192358916))
            Line((-4.681497719729323, -0.5809215192358915), (-4.652656066601329, -2.7195157048936642))
            Line((-4.652656066601329, -2.7195157048936642), (-2.7861583468720013, -3.763835193426573))
            Line((-2.7861583468720013, -3.763835193426573), (-0.948502280270672, -2.6695604963017034))
            Line((-0.948502280270672, -2.6695604963017034), (-0.9625862521831863, -1.6252410077687962))
            Line((-0.9625862521831863, -1.6252410077687962), (-1.2650000000000001, -1.6252410077687962))
            ThreePointArc((-1.265, -1.6252410077687953), (-4.157339375865883, -2.4002410077687912), (-2.0399999999999885, -0.2829016319029227))
        make_face()
        with BuildLine():
            Line((-0.9773439333986662, -0.5309663106439303), (-1.8887931260915947, -0.02100364383989728))
            Line((-1.8887931260915947, -0.02100364383989728), (-2.0399999999999996, -0.2829016319029156))
            ThreePointArc((-2.0399999999999885, -0.2829016319029227), (-1.7189844891608514, -0.5292254969296475), (-1.4726606241341267, -0.8502410077687849))
            Line((-1.47266062413412, -0.8502410077687963), (-0.9768982639792171, -0.5640124756792789))
            Line((-0.9768982639792168, -0.5640124756792795), (-0.9773439333986662, -0.5309663106439304))
        make_face()
        with BuildLine():
            Line((-0.9625862521831863, -1.6252410077687962), (-0.9768982639792168, -0.5640124756792795))
            Line((-0.9768982639792171, -0.5640124756792789), (-1.47266062413412, -0.8502410077687963))
            ThreePointArc((-1.4726606241341267, -0.8502410077687849), (-1.3178149692519456, -1.2240714878598826), (-1.265, -1.6252410077687962))
            Line((-1.2650000000000001, -1.6252410077687962), (-0.9625862521831863, -1.6252410077687962))
        make_face()
        with BuildLine():
            Line((-0.9261226564166762, 1.646390520583255), (-0.7750000000000001, 1.9081426396717127))
            ThreePointArc((-0.7750000000000113, 1.9081426396717192), (-0.7749999999999944, 4.592821391403476), (1.55, 3.2504820155375924))
            ThreePointArc((1.55, 3.250482015537592), (1.342339375865883, 2.4754820155375974), (0.7750000000000109, 1.9081426396717187))
            Line((0.7750000000000004, 1.9081426396717123), (0.9261226564167034, 1.646390520583208))
            Line((0.9261226564167032, 1.646390520583208), (1.8522453128334422, 2.1810876855680315))
            Line((1.8522453128334422, 2.1810876855680315), (1.8522453128334282, 4.319876345507198))
            Line((1.8522453128334282, 4.319876345507198), (2.42e-14, 5.3892706754767685))
            Line((2.429e-14, 5.3892706754767685), (-1.8522453128333423, 4.31987634550714))
            Line((-1.8522453128333423, 4.31987634550714), (-1.8522453128333352, 2.181087685568033))
            Line((-1.8522453128333352, 2.181087685568033), (-0.9261226564166765, 1.646390520583255))
        make_face()
        with BuildLine():
            ThreePointArc((1.09e-15, 1.7004820155375924), (-0.4011695199089123, 1.7532969847895379), (-0.7750000000000113, 1.9081426396717192))
            Line((-0.7750000000000001, 1.9081426396717127), (-0.9261226564166762, 1.646390520583255))
            Line((-0.9261226564166765, 1.646390520583255), (5.396e-14, 1.1116933555984359))
            Line((0, 1.1116933555984359), (0, 1.7004820155375924))
        make_face()
        with BuildLine():
            Line((0.9261226564167034, 1.646390520583208), (0.7750000000000004, 1.9081426396717123))
            ThreePointArc((0.7750000000000109, 1.9081426396717187), (0.4011695199089145, 1.7532969847895385), (1.09e-15, 1.7004820155375924))
            Line((0, 1.7004820155375924), (0, 1.1116933555984359))
            Line((5.399e-14, 1.1116933555984359), (0.9261226564167032, 1.646390520583208))
        make_face()
    extrude(amount=-CUT_EXTRUDE9_DEPTH, mode=Mode.SUBTRACT)


solid = cut_extrude7_piece_1_1.part
